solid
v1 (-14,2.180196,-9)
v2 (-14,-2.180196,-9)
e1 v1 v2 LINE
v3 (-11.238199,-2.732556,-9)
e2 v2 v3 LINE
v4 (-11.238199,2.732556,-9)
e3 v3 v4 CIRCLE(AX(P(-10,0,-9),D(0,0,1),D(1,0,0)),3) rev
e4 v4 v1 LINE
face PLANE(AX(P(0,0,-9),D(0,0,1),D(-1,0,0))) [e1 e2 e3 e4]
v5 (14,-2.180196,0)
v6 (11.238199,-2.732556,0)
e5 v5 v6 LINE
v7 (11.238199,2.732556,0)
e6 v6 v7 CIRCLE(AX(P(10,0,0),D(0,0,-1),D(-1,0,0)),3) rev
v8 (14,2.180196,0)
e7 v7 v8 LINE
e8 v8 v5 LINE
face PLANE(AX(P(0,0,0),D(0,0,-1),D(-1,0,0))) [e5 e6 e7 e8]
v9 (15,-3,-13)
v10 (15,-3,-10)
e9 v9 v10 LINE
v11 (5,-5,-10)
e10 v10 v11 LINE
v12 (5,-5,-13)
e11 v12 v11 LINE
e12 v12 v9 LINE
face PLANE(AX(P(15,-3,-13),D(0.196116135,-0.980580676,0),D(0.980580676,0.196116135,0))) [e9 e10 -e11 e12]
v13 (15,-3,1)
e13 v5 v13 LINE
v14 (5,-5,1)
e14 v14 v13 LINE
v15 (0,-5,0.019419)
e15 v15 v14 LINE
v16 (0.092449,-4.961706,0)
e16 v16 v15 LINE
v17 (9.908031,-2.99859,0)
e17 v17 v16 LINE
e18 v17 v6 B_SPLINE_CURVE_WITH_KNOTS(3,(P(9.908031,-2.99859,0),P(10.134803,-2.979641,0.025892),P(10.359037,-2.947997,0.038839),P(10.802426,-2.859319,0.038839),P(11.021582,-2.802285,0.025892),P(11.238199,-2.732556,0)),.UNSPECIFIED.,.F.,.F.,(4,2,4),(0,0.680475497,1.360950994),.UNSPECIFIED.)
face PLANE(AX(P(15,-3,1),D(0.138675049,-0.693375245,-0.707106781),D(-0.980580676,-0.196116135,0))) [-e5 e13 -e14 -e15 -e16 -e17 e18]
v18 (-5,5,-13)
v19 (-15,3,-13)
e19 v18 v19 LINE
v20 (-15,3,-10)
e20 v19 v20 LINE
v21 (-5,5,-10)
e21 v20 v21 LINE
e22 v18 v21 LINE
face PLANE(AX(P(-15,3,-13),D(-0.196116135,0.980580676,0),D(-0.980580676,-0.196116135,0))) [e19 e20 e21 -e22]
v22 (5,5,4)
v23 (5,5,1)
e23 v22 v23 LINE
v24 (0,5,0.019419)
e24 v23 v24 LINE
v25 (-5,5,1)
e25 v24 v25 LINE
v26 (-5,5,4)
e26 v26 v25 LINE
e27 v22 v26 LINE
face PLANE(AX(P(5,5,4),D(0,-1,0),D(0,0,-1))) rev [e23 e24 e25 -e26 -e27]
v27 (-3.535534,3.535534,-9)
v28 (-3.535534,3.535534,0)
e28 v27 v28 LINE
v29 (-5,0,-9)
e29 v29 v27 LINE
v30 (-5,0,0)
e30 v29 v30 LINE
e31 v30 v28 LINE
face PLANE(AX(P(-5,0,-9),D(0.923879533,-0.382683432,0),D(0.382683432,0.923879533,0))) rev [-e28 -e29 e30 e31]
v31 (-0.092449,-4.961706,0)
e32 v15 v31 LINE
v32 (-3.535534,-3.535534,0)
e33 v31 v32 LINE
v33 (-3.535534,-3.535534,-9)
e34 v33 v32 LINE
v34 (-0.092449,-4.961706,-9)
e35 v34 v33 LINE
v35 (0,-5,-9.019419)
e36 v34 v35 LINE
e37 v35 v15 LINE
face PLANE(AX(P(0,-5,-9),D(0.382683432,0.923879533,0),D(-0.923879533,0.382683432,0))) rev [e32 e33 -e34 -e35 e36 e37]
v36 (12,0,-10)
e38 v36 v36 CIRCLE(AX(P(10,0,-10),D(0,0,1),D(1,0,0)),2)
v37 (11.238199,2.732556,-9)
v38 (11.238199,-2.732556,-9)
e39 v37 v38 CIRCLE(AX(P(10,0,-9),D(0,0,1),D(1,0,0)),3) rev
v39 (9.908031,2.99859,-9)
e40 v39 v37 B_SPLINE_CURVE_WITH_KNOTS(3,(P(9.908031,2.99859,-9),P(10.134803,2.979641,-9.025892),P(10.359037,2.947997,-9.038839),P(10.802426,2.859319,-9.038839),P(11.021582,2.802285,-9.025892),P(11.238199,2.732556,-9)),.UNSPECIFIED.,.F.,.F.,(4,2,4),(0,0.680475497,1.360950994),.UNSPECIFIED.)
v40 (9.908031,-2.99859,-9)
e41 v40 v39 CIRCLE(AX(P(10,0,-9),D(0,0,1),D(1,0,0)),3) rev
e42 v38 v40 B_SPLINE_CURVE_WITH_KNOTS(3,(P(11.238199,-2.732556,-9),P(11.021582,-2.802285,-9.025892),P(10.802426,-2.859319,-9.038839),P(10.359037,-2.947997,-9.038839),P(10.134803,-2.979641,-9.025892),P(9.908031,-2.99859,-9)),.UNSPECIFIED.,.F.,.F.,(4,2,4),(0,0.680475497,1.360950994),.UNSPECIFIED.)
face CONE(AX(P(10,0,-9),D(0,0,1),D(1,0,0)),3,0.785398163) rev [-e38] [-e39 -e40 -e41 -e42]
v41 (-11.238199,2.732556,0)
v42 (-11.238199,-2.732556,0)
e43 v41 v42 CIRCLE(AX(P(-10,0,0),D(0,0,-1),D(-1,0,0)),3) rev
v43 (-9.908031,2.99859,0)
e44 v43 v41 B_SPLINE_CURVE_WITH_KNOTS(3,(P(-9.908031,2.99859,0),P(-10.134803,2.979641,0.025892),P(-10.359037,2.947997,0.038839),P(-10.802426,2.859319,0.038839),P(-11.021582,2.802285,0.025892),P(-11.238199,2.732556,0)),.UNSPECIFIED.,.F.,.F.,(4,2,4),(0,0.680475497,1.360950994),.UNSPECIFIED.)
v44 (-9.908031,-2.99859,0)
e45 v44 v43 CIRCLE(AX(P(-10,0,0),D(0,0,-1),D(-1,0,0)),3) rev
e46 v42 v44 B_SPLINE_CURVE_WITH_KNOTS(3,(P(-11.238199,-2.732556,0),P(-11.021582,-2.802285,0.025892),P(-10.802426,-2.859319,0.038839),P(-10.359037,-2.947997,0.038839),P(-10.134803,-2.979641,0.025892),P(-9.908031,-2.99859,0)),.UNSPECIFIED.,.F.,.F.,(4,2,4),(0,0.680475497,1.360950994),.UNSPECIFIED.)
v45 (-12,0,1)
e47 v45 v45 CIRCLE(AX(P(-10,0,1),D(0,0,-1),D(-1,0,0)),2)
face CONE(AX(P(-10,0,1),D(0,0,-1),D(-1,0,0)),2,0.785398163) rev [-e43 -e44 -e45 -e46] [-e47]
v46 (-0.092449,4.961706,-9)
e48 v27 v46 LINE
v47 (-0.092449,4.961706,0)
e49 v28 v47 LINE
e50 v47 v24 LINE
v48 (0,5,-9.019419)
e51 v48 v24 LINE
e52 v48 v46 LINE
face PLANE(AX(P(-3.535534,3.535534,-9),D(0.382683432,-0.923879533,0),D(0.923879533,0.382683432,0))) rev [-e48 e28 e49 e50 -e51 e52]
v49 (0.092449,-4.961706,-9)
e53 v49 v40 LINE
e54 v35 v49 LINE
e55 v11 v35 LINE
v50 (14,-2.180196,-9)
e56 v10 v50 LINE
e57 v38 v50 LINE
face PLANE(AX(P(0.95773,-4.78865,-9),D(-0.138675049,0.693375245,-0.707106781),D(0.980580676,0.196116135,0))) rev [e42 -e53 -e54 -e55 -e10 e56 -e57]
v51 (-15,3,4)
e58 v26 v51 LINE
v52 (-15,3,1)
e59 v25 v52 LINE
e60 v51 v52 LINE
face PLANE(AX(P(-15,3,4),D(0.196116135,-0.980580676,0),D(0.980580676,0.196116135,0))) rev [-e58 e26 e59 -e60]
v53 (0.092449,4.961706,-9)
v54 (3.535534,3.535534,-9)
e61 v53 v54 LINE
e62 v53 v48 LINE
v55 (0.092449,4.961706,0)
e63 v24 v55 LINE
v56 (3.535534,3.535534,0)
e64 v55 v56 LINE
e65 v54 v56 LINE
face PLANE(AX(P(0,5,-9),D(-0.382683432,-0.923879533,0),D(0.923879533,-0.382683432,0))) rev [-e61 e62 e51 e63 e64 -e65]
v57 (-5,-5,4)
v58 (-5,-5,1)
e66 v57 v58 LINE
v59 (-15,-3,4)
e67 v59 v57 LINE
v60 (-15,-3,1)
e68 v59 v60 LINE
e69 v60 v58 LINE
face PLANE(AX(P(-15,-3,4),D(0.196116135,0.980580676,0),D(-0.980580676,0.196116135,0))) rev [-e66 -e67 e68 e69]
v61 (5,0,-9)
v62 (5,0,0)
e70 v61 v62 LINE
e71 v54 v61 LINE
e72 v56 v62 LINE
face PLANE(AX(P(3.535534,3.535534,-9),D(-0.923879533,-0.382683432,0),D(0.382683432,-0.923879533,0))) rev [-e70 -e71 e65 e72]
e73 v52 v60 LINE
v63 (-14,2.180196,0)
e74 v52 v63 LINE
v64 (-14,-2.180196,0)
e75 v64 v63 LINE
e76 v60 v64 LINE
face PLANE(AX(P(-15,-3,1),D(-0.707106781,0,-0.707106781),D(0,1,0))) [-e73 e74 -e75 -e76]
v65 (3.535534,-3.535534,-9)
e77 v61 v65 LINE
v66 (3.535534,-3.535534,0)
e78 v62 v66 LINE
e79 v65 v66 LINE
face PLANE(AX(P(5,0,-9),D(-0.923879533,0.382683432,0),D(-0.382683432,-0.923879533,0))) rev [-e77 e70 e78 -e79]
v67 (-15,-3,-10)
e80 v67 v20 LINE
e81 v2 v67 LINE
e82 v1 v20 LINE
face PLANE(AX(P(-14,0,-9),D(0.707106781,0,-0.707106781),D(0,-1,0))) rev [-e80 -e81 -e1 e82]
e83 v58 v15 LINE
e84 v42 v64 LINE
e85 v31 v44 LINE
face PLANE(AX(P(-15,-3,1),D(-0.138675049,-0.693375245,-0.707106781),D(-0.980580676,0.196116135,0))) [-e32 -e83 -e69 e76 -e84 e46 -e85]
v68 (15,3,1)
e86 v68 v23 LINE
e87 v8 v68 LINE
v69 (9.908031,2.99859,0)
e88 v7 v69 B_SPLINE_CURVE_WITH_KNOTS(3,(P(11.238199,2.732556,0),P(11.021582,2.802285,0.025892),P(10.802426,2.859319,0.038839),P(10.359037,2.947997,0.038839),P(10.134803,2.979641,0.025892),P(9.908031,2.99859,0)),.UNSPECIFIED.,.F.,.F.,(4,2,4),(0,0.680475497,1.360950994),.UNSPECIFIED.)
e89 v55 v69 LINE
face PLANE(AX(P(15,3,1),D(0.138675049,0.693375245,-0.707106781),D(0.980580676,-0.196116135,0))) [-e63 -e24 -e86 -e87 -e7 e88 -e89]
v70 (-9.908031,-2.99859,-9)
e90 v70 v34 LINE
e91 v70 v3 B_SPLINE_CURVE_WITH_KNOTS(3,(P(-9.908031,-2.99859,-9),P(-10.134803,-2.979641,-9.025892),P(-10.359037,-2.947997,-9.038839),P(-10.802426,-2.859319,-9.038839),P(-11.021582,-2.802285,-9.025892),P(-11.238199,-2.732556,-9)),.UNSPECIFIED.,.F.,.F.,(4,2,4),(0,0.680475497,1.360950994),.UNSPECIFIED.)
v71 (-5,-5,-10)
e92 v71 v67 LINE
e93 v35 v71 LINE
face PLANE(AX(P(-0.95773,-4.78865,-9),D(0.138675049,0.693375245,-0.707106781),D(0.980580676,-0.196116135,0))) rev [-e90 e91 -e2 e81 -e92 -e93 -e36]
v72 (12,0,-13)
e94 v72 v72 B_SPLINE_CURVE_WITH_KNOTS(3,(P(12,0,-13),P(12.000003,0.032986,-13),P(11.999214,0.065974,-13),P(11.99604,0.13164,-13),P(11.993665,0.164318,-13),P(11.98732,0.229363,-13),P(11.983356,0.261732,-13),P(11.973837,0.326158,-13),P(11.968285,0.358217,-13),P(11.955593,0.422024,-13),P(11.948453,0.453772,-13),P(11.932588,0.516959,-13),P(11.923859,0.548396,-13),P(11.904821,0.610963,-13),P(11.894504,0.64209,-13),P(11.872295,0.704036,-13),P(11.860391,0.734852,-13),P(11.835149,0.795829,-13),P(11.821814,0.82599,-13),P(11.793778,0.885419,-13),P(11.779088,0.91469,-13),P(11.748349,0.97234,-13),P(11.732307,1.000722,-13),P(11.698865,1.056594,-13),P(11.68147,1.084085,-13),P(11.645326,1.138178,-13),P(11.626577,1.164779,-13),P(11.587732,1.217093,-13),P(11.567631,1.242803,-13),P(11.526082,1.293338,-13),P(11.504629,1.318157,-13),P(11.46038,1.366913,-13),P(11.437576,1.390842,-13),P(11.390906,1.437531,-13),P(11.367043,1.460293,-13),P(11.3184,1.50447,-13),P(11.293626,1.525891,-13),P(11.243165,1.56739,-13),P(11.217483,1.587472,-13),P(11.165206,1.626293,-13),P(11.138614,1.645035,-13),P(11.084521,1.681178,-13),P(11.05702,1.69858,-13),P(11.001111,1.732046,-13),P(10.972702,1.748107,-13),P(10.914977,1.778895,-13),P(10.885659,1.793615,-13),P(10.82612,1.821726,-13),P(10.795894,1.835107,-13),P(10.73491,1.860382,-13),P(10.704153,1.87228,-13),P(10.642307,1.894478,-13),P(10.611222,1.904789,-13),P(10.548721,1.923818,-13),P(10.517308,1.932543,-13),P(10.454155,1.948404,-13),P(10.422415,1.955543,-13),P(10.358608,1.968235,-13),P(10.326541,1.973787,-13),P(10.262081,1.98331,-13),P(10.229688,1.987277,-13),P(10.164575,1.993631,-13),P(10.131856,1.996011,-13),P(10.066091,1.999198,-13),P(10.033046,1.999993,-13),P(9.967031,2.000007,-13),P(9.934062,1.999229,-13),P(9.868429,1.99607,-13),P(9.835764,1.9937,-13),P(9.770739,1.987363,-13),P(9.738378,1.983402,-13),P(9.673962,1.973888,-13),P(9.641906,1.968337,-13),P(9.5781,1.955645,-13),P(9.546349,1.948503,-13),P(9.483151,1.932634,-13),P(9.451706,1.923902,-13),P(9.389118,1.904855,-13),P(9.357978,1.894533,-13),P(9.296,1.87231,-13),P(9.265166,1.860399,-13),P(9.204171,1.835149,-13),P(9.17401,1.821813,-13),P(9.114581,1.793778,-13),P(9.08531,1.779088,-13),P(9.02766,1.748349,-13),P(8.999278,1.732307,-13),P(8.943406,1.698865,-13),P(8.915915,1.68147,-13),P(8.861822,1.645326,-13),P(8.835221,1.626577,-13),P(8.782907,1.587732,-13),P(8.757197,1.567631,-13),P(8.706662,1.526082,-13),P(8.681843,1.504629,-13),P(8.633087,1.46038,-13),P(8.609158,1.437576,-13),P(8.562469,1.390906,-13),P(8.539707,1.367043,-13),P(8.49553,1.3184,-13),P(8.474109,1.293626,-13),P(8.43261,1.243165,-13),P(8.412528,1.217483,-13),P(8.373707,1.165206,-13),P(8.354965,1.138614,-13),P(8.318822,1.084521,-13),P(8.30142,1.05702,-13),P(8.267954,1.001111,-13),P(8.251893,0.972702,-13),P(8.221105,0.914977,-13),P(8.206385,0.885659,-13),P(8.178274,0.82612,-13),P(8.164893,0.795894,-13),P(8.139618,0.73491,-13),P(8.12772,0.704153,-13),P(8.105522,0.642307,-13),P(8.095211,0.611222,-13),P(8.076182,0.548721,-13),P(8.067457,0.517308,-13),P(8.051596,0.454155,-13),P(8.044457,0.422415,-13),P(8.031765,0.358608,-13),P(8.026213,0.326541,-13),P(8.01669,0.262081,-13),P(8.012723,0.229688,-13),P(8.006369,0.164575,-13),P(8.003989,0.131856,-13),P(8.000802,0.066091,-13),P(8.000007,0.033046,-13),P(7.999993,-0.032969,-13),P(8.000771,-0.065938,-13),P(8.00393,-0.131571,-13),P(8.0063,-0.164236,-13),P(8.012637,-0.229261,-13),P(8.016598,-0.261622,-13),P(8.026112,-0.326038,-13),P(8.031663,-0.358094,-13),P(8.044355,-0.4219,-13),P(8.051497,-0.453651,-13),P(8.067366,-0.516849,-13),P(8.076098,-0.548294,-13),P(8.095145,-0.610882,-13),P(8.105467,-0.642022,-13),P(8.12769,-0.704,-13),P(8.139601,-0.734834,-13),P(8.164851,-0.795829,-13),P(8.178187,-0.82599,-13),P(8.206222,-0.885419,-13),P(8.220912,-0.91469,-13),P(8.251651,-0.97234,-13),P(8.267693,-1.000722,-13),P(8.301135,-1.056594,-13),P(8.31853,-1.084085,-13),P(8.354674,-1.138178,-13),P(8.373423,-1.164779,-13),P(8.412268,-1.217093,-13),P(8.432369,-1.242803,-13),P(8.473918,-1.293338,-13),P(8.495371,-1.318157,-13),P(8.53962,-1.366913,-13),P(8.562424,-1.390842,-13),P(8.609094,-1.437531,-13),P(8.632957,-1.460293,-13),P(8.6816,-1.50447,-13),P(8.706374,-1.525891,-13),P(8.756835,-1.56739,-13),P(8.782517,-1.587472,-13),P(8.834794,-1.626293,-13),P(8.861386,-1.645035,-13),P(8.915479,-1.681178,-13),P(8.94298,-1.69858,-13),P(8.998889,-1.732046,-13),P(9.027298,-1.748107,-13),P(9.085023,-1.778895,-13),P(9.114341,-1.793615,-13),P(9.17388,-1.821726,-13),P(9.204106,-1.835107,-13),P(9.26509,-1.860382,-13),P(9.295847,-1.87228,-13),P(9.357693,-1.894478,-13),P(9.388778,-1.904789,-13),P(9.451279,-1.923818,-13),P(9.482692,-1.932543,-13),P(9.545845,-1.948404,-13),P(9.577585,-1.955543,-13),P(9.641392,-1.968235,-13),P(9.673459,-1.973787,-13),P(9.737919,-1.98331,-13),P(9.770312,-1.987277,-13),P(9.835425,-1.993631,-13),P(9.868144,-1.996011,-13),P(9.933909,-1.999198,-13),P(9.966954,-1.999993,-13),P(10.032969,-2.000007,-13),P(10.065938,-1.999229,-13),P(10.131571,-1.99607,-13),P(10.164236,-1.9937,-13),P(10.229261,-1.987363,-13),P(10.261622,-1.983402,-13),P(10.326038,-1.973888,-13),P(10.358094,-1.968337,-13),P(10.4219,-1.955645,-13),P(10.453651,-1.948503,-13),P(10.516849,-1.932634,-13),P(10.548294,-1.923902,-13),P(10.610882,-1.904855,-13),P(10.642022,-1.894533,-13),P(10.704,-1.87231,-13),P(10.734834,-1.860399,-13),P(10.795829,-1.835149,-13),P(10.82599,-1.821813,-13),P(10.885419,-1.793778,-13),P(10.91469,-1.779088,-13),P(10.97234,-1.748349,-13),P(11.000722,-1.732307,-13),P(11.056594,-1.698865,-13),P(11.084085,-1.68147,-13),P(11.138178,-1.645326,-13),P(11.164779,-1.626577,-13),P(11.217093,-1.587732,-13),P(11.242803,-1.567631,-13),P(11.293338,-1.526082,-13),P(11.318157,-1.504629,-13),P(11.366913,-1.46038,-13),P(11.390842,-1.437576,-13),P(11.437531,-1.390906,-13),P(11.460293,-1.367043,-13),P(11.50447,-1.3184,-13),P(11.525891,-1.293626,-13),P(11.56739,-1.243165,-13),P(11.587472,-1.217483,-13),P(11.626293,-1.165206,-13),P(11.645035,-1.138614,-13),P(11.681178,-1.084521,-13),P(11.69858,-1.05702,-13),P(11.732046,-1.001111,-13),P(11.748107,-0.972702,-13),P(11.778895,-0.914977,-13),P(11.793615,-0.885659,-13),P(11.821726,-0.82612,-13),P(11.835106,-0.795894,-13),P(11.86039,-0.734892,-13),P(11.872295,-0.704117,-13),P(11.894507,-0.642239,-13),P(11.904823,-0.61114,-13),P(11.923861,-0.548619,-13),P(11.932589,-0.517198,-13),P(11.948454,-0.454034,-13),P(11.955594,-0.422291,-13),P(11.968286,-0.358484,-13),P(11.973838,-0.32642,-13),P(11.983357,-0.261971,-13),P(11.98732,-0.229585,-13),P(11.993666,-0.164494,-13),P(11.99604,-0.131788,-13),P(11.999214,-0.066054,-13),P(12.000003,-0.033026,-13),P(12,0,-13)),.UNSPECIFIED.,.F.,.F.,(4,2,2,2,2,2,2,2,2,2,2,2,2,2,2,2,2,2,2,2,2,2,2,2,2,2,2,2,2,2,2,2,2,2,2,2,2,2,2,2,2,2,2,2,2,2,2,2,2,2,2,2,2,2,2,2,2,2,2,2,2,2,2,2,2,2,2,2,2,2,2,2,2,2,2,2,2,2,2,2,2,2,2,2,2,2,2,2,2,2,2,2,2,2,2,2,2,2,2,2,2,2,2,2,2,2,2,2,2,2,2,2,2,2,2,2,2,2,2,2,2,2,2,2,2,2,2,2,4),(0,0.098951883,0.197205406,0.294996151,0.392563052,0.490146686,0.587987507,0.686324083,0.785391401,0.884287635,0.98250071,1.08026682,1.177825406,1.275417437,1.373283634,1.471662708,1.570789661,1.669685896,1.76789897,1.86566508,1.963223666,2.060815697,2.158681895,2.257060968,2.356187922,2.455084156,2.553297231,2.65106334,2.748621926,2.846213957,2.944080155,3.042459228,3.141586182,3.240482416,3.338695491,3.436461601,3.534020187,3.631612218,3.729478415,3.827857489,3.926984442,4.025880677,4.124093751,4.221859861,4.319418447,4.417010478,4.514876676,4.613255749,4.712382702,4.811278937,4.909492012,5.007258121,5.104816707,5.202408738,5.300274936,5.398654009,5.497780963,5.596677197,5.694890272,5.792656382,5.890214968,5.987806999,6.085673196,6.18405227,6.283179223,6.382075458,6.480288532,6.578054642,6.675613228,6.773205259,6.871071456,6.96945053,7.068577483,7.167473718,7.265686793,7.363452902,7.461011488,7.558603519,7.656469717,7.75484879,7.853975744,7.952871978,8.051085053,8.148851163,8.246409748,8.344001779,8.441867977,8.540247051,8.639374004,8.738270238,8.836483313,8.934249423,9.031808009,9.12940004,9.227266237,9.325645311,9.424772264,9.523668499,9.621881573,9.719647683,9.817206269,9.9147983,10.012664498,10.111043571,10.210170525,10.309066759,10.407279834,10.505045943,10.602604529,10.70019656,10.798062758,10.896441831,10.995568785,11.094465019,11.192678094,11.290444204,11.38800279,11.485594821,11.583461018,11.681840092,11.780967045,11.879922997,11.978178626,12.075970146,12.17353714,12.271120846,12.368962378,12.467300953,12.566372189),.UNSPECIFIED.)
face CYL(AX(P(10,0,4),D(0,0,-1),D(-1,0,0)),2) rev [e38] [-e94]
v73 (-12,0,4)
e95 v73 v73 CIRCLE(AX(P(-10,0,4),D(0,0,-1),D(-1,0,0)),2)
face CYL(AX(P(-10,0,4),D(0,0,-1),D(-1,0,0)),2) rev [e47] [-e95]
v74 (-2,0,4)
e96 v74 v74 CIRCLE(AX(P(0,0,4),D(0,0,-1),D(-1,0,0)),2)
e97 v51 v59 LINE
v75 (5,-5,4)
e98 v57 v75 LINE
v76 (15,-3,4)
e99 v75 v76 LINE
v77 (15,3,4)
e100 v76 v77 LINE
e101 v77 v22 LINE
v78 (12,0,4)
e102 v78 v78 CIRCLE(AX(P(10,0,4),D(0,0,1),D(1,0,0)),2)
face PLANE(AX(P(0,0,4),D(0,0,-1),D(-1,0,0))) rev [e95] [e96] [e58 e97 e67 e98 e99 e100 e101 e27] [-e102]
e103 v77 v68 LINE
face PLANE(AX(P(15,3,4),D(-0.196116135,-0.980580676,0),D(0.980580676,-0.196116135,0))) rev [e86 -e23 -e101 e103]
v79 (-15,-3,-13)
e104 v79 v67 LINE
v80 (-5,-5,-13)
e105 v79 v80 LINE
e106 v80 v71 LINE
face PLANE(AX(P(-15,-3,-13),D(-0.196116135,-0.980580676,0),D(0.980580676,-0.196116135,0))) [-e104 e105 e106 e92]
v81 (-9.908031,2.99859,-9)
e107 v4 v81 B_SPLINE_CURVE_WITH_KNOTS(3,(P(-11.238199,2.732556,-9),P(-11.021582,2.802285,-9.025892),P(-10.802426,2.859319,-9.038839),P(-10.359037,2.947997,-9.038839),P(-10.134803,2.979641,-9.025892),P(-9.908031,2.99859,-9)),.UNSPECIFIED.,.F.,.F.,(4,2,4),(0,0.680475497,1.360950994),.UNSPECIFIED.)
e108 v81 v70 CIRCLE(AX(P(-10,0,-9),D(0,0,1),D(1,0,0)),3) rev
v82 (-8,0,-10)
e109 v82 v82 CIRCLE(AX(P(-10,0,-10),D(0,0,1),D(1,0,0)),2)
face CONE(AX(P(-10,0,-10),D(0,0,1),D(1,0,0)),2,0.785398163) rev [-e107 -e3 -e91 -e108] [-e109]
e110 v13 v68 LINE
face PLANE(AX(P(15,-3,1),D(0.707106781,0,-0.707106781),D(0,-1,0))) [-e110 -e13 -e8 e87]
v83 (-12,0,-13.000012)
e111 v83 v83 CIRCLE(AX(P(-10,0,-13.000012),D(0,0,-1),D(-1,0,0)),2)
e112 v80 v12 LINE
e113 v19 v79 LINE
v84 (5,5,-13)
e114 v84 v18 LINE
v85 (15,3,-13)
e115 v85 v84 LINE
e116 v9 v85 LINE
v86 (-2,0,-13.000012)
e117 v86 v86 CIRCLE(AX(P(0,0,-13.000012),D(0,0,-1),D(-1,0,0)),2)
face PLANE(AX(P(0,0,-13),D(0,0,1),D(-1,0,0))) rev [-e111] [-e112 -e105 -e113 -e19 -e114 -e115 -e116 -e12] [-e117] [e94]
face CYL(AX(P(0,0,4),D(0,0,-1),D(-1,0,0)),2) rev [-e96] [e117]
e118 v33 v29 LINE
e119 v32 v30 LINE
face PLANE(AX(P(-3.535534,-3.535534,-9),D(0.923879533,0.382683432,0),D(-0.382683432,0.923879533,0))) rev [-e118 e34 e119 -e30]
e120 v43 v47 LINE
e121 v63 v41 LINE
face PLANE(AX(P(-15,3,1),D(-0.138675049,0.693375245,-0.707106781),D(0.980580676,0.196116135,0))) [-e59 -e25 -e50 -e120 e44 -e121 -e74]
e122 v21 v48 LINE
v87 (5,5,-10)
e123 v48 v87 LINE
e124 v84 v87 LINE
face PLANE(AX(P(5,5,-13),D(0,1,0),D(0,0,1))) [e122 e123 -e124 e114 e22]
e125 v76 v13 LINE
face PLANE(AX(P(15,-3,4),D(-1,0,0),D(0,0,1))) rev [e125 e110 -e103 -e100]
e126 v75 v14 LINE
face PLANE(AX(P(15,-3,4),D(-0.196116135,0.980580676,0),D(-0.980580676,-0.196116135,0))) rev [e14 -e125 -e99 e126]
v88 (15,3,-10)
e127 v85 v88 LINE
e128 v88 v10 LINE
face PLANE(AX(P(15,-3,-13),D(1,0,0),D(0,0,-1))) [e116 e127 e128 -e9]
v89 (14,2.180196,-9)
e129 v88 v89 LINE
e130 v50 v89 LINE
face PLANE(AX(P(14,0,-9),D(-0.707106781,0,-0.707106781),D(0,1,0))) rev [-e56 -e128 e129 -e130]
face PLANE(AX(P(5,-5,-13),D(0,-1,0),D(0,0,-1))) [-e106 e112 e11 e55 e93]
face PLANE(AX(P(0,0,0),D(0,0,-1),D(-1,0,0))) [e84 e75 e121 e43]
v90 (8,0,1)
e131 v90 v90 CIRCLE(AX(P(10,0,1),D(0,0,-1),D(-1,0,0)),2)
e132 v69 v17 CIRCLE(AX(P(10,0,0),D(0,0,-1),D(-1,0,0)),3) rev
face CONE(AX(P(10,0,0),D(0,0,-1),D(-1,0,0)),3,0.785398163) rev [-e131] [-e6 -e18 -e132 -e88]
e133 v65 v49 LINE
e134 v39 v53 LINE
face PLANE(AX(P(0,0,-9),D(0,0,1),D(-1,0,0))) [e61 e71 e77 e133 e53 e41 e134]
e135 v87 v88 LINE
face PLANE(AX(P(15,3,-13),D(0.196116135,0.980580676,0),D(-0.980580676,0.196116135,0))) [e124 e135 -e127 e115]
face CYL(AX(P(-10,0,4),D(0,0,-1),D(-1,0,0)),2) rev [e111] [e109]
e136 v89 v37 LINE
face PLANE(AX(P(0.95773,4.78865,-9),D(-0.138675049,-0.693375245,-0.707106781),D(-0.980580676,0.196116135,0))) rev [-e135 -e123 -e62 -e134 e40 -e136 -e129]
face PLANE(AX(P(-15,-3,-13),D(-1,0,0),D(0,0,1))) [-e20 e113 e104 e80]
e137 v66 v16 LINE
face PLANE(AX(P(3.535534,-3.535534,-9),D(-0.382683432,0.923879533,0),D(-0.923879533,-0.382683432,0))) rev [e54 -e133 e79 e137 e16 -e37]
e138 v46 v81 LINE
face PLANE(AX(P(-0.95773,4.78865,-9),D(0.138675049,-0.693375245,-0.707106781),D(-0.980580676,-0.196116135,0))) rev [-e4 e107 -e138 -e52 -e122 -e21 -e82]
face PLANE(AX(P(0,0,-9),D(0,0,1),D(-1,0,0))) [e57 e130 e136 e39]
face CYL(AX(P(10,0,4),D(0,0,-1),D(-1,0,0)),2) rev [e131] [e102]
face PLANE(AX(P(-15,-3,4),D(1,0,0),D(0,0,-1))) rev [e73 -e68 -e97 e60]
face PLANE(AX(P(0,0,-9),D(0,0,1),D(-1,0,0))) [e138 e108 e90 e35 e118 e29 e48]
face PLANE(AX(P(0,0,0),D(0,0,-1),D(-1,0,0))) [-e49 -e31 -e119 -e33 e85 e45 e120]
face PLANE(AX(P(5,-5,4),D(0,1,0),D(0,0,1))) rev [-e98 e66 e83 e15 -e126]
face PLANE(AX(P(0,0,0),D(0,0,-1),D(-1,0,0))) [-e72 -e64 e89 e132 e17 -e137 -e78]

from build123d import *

# Parameters (mm, degrees)
EXTRUDE_1_DEPTH          = 4
EXTRUDE_2_DEPTH          = 9
CHAMFER_1_SIZE           = 1
CHAMFER_2_SIZE           = 1
CHAMFER_3_SIZE           = 1
CHAMFER_4_SIZE           = 1
CUT_EXTRUDE_1_DEPTH      = 24.216373532
CUT_EXTRUDE_1_DEPTH_BACK = 24.216373532
SKETCH_4_R               = 2
CHAMFER_5_SIZE           = 1


with BuildPart() as part:
    # 草图1 → 凸台-拉伸1 (new body)
    with BuildSketch(Plane.XY):
        Polygon((15, -3), (15, 3), (5, 5), (-5, 5), (-15, 3), (-15, -3), (-5, -5), (5, -5), align=None)
    extrude_1 = extrude(amount=EXTRUDE_1_DEPTH)

    # 草图2 → 凸台-拉伸2 (add)
    with BuildSketch(Plane(origin=(0, 0, 0), x_dir=(-1, 0, 0), z_dir=(0, 0, -1))):
        Polygon((0, 5), (-3.535533906, 3.535533906), (-5, 0), (-3.535533906, -3.535533906), (0, -5), (3.535533906, -3.535533906), (5, 0), (3.535533906, 3.535533906), align=None)
    extrude(amount=EXTRUDE_2_DEPTH)

    # 镜向1: 凸台-拉伸1 across plane
    add(extrude_1.mirror(Plane(origin=(0, 0, -4.5), x_dir=(1, 0, 0), z_dir=(0, 0, -1))))

    # 倒角1
    # the kernel refuses this chamfer: 1 mm, written as the material it takes off along each edge
    with BuildSketch(Plane(origin=(-17.521742642, -2.495651472, 0), x_dir=(0.19611613513818427, 0.9805806756909201, 0), z_dir=(0.9805806756909201, -0.19611613513818427, 0))) as chamfer_1_piece_1_section:
        Polygon((CHAMFER_1_SIZE, 0), (0, CHAMFER_1_SIZE), (0, 0), align=None)
    chamfer_1_piece_1 = extrude(amount=20.484770979, mode=Mode.PRIVATE)
    chamfer_1_piece_1 = split(chamfer_1_piece_1, bisect_by=Plane(origin=(-15.841163755, 1.561624871, 0), z_dir=(-0.3826834323650901, -0.9238795325112866, 0)), keep=Keep.TOP, mode=Mode.PRIVATE)
    add(chamfer_1_piece_1, mode=Mode.SUBTRACT)
    with BuildSketch(Plane(origin=(-15, 5.571682988, 0), x_dir=(1, 0, 0), z_dir=(0, -1, 0))) as chamfer_1_piece_2:
        Polygon((CHAMFER_1_SIZE, 0), (0, CHAMFER_1_SIZE), (0, 0), align=None)
    extrude(amount=11.143365976, mode=Mode.SUBTRACT)
    with BuildSketch(Plane(origin=(2.565227926, 6.513045585, 0), x_dir=(0.1961161351381843, -0.9805806756909201, 0), z_dir=(-0.9805806756909201, -0.19611613513818427, 0))) as chamfer_1_piece_3_section:
        Polygon((CHAMFER_1_SIZE, 0), (0, CHAMFER_1_SIZE), (0, 0), align=None)
    chamfer_1_piece_3 = extrude(amount=20.484770979, mode=Mode.PRIVATE)
    chamfer_1_piece_3 = split(chamfer_1_piece_3, bisect_by=Plane(origin=(2.724501391, 6.128525427, 0), z_dir=(-0.38268343236508795, 0.9238795325112875, 0)), keep=Keep.TOP, mode=Mode.PRIVATE)
    add(chamfer_1_piece_3, mode=Mode.SUBTRACT)

    # 倒角2
    # the kernel refuses this chamfer: 1 mm, written as the material it takes off along each edge
    with BuildSketch(Plane(origin=(-2.565227926, -6.513045585, 0), x_dir=(-0.1961161351381843, 0.9805806756909202, 0), z_dir=(0.9805806756909201, 0.19611613513818427, 0))) as chamfer_2_piece_1_section:
        Polygon((CHAMFER_2_SIZE, 0), (0, CHAMFER_2_SIZE), (0, 0), align=None)
    chamfer_2_piece_1 = extrude(amount=20.484770979, mode=Mode.PRIVATE)
    chamfer_2_piece_1 = split(chamfer_2_piece_1, bisect_by=Plane(origin=(-2.724501391, -6.128525427, 0), z_dir=(0.3826834323650899, -0.9238795325112867, 0)), keep=Keep.TOP, mode=Mode.PRIVATE)
    add(chamfer_2_piece_1, mode=Mode.SUBTRACT)
    with BuildSketch(Plane(origin=(15, -5.571682988, 0), x_dir=(-1, 0, 0), z_dir=(0, 1, 0))) as chamfer_2_piece_2:
        Polygon((CHAMFER_2_SIZE, 0), (0, CHAMFER_2_SIZE), (0, 0), align=None)
    extrude(amount=11.143365976, mode=Mode.SUBTRACT)
    with BuildSketch(Plane(origin=(17.521742642, 2.495651472, 0), x_dir=(-0.19611613513818427, -0.9805806756909201, 0), z_dir=(-0.9805806756909201, 0.19611613513818427, 0))) as chamfer_2_piece_3_section:
        Polygon((CHAMFER_2_SIZE, 0), (0, CHAMFER_2_SIZE), (0, 0), align=None)
    chamfer_2_piece_3 = extrude(amount=20.484770979, mode=Mode.PRIVATE)
    chamfer_2_piece_3 = split(chamfer_2_piece_3, bisect_by=Plane(origin=(15.841163755, -1.561624871, 0), z_dir=(0.38268343236509167, 0.923879532511286, 0)), keep=Keep.TOP, mode=Mode.PRIVATE)
    add(chamfer_2_piece_3, mode=Mode.SUBTRACT)

    # 倒角3
    # the kernel refuses this chamfer: 1 mm, written as the material it takes off along each edge
    with BuildSketch(Plane(origin=(-17.521742642, -2.495651472, -9), x_dir=(0.19611613513818427, 0.9805806756909201, 0), z_dir=(0.9805806756909201, -0.19611613513818427, 0))) as chamfer_3_piece_1_section:
        Polygon((CHAMFER_3_SIZE, 0), (0, -CHAMFER_3_SIZE), (0, 0), align=None)
    chamfer_3_piece_1 = extrude(amount=20.484770979, mode=Mode.PRIVATE)
    chamfer_3_piece_1 = split(chamfer_3_piece_1, bisect_by=Plane(origin=(-15.841163755, 1.561624871, -9), z_dir=(-0.3826834323650901, -0.9238795325112866, 0)), keep=Keep.TOP, mode=Mode.PRIVATE)
    add(chamfer_3_piece_1, mode=Mode.SUBTRACT)
    with BuildSketch(Plane(origin=(-15, 5.571682988, -9), x_dir=(1, 0, 0), z_dir=(0, -1, 0))) as chamfer_3_piece_2:
        Polygon((CHAMFER_3_SIZE, 0), (0, -CHAMFER_3_SIZE), (0, 0), align=None)
    extrude(amount=11.143365976, mode=Mode.SUBTRACT)
    with BuildSketch(Plane(origin=(2.565227926, 6.513045585, -9), x_dir=(0.1961161351381843, -0.9805806756909202, 0), z_dir=(-0.9805806756909201, -0.19611613513818427, 0))) as chamfer_3_piece_3_section:
        Polygon((CHAMFER_3_SIZE, 0), (0, -CHAMFER_3_SIZE), (0, 0), align=None)
    chamfer_3_piece_3 = extrude(amount=20.484770979, mode=Mode.PRIVATE)
    chamfer_3_piece_3 = split(chamfer_3_piece_3, bisect_by=Plane(origin=(2.724501391, 6.128525427, -9), z_dir=(-0.38268343236508795, 0.9238795325112875, 0)), keep=Keep.TOP, mode=Mode.PRIVATE)
    add(chamfer_3_piece_3, mode=Mode.SUBTRACT)

    # 倒角4
    # the kernel refuses this chamfer: 1 mm, written as the material it takes off along each edge
    with BuildSketch(Plane(origin=(-2.565227926, -6.513045585, -9), x_dir=(0, 0, -1), z_dir=(0.9805806756909201, 0.19611613513818427, 0))) as chamfer_4_piece_1_section:
        Polygon((CHAMFER_4_SIZE, 0), (0, CHAMFER_4_SIZE), (0, 0), align=None)
    chamfer_4_piece_1 = extrude(amount=20.484770979, mode=Mode.PRIVATE)
    chamfer_4_piece_1 = split(chamfer_4_piece_1, bisect_by=Plane(origin=(-2.724501391, -6.128525427, -9), z_dir=(0.3826834323650899, -0.9238795325112867, 0)), keep=Keep.TOP, mode=Mode.PRIVATE)
    add(chamfer_4_piece_1, mode=Mode.SUBTRACT)
    with BuildSketch(Plane(origin=(15, -5.571682988, -9), x_dir=(0, 0, -1), z_dir=(0, 1, 0))) as chamfer_4_piece_2:
        Polygon((CHAMFER_4_SIZE, 0), (0, CHAMFER_4_SIZE), (0, 0), align=None)
    extrude(amount=11.143365976, mode=Mode.SUBTRACT)
    with BuildSketch(Plane(origin=(17.521742642, 2.495651472, -9), x_dir=(0, 0, -1), z_dir=(-0.9805806756909201, 0.19611613513818427, 0))) as chamfer_4_piece_3_section:
        Polygon((CHAMFER_4_SIZE, 0), (0, CHAMFER_4_SIZE), (0, 0), align=None)
    chamfer_4_piece_3 = extrude(amount=20.484770979, mode=Mode.PRIVATE)
    chamfer_4_piece_3 = split(chamfer_4_piece_3, bisect_by=Plane(origin=(15.841163755, -1.561624871, -9), z_dir=(0.38268343236509167, 0.923879532511286, 0)), keep=Keep.TOP, mode=Mode.PRIVATE)
    add(chamfer_4_piece_3, mode=Mode.SUBTRACT)

    # 草图4 → 切除-拉伸1 (cut, two sides: drawn at the far end of the back side and taken through both)
    with BuildSketch(Plane(origin=(0, 0, -13), x_dir=(-1, 0, 0), z_dir=(0, 0, -1)).offset(-CUT_EXTRUDE_1_DEPTH_BACK)):
        Circle(SKETCH_4_R)
        with Locations((10, 0)):
            Circle(SKETCH_4_R)
        with Locations(Location((-10, 0, 0), (0, 0, 180))):
            Circle(SKETCH_4_R)
    extrude(amount=CUT_EXTRUDE_1_DEPTH + CUT_EXTRUDE_1_DEPTH_BACK, mode=Mode.SUBTRACT)

    # 倒角5
    # the kernel refuses this chamfer: 1 mm, written as the material it takes off along each edge
    with BuildSketch(Plane(origin=(10, 0, 0), x_dir=(1, 0, 0), z_dir=(0, 1, 0))) as chamfer_5_piece_1:
        Polygon((2 + CHAMFER_5_SIZE, 0), (2, -CHAMFER_5_SIZE), (2, 0), align=None)
    revolve(axis=Axis((10, 0, 0), (0, 0, -1)), mode=Mode.SUBTRACT)
    with BuildSketch(Plane(origin=(10, 0, -9), x_dir=(1, 0, 0), z_dir=(0, 1, 0))) as chamfer_5_piece_2:
        Polygon((2 + CHAMFER_5_SIZE, 0), (2, CHAMFER_5_SIZE), (2, 0), align=None)
    revolve(axis=Axis((10, 0, -9), (0, 0, -1)), mode=Mode.SUBTRACT)
    with BuildSketch(Plane(origin=(-10, 0, -9), x_dir=(-1, 0, 0), z_dir=(0, -1, 0))) as chamfer_5_piece_3:
        Polygon((2, CHAMFER_5_SIZE), (2 + CHAMFER_5_SIZE, 0), (2, 0), align=None)
    revolve(axis=Axis((-10, 0, -9), (0, 0, -1)), mode=Mode.SUBTRACT)
    with BuildSketch(Plane(origin=(-10, 0, 0), x_dir=(-1, 0, 0), z_dir=(0, -1, 0))) as chamfer_5_piece_4:
        Polygon((2, -CHAMFER_5_SIZE), (2 + CHAMFER_5_SIZE, 0), (2, 0), align=None)
    revolve(axis=Axis((-10, 0, 0), (0, 0, -1)), mode=Mode.SUBTRACT)


solid = part.part
